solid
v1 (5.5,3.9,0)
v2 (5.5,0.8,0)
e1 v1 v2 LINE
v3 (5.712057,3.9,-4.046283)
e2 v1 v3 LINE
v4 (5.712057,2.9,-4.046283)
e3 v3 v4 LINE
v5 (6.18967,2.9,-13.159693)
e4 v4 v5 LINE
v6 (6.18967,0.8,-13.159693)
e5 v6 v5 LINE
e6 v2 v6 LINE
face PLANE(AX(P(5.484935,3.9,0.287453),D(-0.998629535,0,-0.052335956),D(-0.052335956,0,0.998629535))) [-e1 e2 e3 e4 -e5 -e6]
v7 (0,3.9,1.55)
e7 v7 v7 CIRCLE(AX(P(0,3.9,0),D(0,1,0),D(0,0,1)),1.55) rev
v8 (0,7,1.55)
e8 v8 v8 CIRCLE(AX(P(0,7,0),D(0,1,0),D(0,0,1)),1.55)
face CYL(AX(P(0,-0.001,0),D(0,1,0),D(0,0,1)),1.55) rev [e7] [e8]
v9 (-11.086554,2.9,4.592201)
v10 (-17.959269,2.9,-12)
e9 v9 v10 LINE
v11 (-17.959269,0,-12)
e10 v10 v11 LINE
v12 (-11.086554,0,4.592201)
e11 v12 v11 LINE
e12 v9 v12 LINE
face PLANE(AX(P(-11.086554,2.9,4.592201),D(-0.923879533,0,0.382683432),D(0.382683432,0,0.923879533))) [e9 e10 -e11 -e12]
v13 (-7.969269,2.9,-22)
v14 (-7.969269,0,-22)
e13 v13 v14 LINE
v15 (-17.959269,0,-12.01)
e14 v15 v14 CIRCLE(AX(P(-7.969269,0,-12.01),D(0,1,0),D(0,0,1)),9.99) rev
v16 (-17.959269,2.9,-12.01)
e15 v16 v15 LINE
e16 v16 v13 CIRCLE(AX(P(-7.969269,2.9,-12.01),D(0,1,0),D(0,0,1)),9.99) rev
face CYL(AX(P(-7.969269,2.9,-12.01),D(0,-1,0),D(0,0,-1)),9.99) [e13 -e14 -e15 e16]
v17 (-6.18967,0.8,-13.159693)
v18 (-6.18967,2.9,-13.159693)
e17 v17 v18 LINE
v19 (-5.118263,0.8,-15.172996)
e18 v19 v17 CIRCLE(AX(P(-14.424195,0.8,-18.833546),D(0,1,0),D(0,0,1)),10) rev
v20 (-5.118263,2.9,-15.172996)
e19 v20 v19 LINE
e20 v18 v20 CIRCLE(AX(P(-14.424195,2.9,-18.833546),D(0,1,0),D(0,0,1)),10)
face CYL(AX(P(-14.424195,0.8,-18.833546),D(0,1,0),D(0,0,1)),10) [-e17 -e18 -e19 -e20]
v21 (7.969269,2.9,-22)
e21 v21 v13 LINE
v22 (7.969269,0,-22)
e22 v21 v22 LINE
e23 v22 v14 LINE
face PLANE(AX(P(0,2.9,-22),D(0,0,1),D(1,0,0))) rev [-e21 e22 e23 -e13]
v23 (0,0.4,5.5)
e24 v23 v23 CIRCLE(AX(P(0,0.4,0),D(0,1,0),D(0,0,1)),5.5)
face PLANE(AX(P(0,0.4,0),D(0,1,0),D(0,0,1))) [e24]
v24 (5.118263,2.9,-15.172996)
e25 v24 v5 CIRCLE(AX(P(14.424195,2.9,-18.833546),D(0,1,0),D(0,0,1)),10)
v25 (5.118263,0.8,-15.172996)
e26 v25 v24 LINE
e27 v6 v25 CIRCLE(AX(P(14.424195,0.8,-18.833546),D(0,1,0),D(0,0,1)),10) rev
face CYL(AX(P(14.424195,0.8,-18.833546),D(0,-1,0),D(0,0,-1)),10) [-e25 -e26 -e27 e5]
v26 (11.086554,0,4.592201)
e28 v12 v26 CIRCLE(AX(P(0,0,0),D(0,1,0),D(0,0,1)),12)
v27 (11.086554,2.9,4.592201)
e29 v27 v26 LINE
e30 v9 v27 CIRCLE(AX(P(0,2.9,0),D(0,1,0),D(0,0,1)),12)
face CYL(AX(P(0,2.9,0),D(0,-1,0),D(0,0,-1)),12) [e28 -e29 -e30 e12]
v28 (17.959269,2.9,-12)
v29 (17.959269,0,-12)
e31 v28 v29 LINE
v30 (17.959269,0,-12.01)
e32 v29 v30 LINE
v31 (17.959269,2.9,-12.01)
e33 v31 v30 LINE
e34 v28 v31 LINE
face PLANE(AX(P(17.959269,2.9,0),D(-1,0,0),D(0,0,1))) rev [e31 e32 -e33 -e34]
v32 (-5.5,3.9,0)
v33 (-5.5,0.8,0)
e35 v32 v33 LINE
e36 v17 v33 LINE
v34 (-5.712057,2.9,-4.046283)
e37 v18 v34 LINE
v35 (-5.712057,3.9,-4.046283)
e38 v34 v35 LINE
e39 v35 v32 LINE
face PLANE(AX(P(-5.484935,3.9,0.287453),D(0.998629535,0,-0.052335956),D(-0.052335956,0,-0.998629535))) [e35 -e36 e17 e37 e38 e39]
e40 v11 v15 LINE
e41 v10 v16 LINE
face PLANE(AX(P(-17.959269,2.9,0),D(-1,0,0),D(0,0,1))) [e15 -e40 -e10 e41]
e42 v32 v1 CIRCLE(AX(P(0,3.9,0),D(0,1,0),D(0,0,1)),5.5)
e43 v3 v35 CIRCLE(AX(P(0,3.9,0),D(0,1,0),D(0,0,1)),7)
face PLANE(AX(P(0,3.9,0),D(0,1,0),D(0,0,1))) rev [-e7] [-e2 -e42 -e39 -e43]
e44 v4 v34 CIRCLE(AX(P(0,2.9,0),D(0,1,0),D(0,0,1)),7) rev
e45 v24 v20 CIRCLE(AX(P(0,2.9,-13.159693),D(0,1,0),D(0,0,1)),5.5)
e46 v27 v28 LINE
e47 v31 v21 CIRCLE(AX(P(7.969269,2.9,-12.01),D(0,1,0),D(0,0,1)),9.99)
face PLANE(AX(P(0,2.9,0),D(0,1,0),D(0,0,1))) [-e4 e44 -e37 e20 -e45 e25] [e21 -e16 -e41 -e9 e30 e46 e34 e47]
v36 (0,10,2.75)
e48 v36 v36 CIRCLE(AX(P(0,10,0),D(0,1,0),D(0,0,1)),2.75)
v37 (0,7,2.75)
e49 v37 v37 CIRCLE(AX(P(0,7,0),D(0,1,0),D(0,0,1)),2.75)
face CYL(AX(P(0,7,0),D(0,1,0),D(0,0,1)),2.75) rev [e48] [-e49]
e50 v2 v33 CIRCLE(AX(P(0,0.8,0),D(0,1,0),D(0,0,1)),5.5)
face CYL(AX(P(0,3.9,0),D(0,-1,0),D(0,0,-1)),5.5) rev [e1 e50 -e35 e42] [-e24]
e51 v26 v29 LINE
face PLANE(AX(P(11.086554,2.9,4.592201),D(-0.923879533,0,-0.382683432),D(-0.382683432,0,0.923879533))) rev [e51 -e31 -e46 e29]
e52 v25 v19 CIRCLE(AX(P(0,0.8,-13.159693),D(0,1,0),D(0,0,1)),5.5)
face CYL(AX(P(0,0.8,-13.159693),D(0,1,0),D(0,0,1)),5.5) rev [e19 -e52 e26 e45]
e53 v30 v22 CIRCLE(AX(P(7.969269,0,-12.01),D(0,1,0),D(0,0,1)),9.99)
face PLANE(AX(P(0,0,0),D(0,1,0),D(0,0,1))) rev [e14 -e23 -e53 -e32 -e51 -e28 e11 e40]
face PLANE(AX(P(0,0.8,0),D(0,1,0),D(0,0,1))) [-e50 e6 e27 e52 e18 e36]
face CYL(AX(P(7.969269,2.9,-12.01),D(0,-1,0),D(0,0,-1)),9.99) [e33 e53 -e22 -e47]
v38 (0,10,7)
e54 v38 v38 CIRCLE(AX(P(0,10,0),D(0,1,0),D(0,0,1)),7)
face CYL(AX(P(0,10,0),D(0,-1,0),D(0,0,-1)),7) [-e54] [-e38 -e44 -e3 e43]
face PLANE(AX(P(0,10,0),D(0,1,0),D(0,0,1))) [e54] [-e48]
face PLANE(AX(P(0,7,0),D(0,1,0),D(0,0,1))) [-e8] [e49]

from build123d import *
from build123d.topology import SkipClean

# Parameters (mm, degrees)
SKETCH1_R           = 12
SKETCH1_R_2         = 7
SKETCH1_R_3         = 5.5
BOSS_EXTRUDE1_DEPTH = 2.9
SKETCH1_3_R         = 7
SKETCH1_3_R_2       = 5.5
BOSS_EXTRUDE2_DEPTH = 10
SKETCH2_R           = 5.5
CUT_EXTRUDE2_DEPTH  = 1
SKETCH3_R           = 5.5
CUT_EXTRUDE3_DEPTH  = 1
CUT_EXTRUDE4_START  = -2.5
SKETCH3_4_R         = 5.5
CUT_EXTRUDE4_DEPTH  = 2.5
CUT_EXTRUDE6_REACH  = 32.109
SKETCH5_R           = 1.55
CUT_EXTRUDE7_START  = -2.1
CUT_EXTRUDE7_DEPTH  = 2.1
SKETCH6_R           = 5.5
CUT_EXTRUDE8_DEPTH  = 2.1
FILLET1_R           = 10
SKETCH5_3_R         = 2.75
SKETCH5_3_R_2       = 1.55
CUT_EXTRUDE9_DEPTH  = 3


with BuildPart() as part:
    # Sketch1 → Boss-Extrude1 (new body)
    # profile 1 of 4: a face of its own
    with BuildSketch(Plane(origin=(0, 0, 0), x_dir=(1, 0, 0), z_dir=(0, 1, 0))):
        Circle(SKETCH1_R)
        Circle(SKETCH1_R_2, mode=Mode.SUBTRACT)
    # profile 2 of 4: a face of its own
    with BuildSketch(Plane(origin=(0, 0, 0), x_dir=(1, 0, 0), z_dir=(0, 1, 0))):
        with BuildLine():
            ThreePointArc((12, -2.94e-15), (11.769423369196444, -2.341083842286014), (11.086554407231223, -4.592201147108209))
            Line((11.086554407231223, -4.592201147108209), (17.959269151985882, 12))
            Line((17.959269151985882, 12), (17.959269151985882, 12.009999999999998))
            ThreePointArc((17.959269151985882, 12.009999999999998), (15.033265896039495, 19.07399674405361), (7.969269151985883, 21.999999999999996))
            Line((7.969269151985883, 21.999999999999996), (-7.969269151985883, 21.999999999999996))
            ThreePointArc((-7.969269151985883, 21.999999999999993), (-15.033265896039492, 19.07399674405361), (-17.959269151985882, 12.009999999999998))
            Line((-17.959269151985882, 12.009999999999998), (-17.959269151985882, 12))
            Line((-17.95926915198589, 12.000000000000014), (-11.086554257092926, -4.592201509574117))
            ThreePointArc((-11.08655425709292, -4.592201509574119), (-2.3410840346818973, 11.769423330926521), (12, 0))
        make_face()
    # profile 3 of 4: a face of its own
    with BuildSketch(Plane(origin=(0, 0, 0), x_dir=(1, 0, 0), z_dir=(0, 1, 0))):
        Circle(SKETCH1_R_2)
    # profile 4 of 4: a face of its own
    with BuildSketch(Plane(origin=(0, 0, 0), x_dir=(1, 0, 0), z_dir=(0, 1, 0))):
        Circle(SKETCH1_R_3)
    extrude(amount=BOSS_EXTRUDE1_DEPTH)

    # Sketch1<3> → Boss-Extrude2 (add)
    with BuildSketch(Plane(origin=(0, 0, 0), x_dir=(1, 0, 0), z_dir=(0, 1, 0))):
        with Locations(Location((0, 0, 0), (0, 0, 270))):
            Circle(SKETCH1_3_R)
        Circle(SKETCH1_3_R_2)
    extrude(amount=BOSS_EXTRUDE2_DEPTH)

    # Sketch2 → Cut-Extrude2 (cut)
    with SkipClean():  # the faces are left unmerged after this step: merging them gives an invalid solid
        with BuildSketch(Plane(origin=(0, 2.9, 0), x_dir=(1, 0, 0), z_dir=(0, 1, 0))):
            with BuildLine():
                ThreePointArc((-5.500000000000162, 4.330127018921988), (-1.9852e-13, 7), (5.499999999999917, 4.330127018922298))
                Line((5.5, 4.330127018922322), (5.5, 11.712224753227023))
                Line((5.5, 11.712224753227023), (-5.5, 11.712224753227023))
                Line((-5.5, 11.712224753227023), (-5.5, 4.330127018921939))
            make_face()
            with Locations(Location((0, 0, 0), (0, 0, 270))):
                Circle(SKETCH2_R)
        extrude(amount=CUT_EXTRUDE2_DEPTH, mode=Mode.SUBTRACT)

    # Sketch3 → Cut-Extrude3 (cut)
    with BuildSketch(Plane(origin=(0, 2.9, 0), x_dir=(1, 0, 0), z_dir=(0, 1, 0))):
        Circle(SKETCH3_R)
        with BuildLine():
            ThreePointArc((-5.5, 3.12e-15), (1.56e-15, 5.5), (5.5, 0))
            Line((5.5, 0), (6.1896702982743115, 13.159693230837554))
            Line((6.1896702982743115, 13.159693230837554), (-6.189670298274319, 13.159693230837554))
            Line((-6.1896702982743195, 13.159693230837554), (-5.5, 0))
        make_face()
    extrude(amount=CUT_EXTRUDE3_DEPTH, mode=Mode.SUBTRACT)

    # Sketch3<4> → Cut-Extrude4 (cut)
    with SkipClean():  # the faces are left unmerged after this step: merging them gives an invalid solid
        with BuildSketch(Plane(origin=(0, 2.9, 0), x_dir=(1, 0, 0), z_dir=(0, 1, 0)).offset(CUT_EXTRUDE4_START)):
            with Locations(Location((0, 0, 0), (0, 0, 180))):
                Circle(SKETCH3_4_R)
        extrude(amount=CUT_EXTRUDE4_DEPTH, mode=Mode.SUBTRACT)

    # Sketch5 → Cut-Extrude6 (cut, up to next)
    with BuildSketch(Plane(origin=(0, 10, 0), x_dir=(1, 0, 0), z_dir=(0, 1, 0)), mode=Mode.PRIVATE) as cut_extrude6_sk1:
        with Locations(Location((0, 0, 0), (0, 0, 270))):
            Circle(SKETCH5_R)
    cut_extrude6_tool1 = extrude(cut_extrude6_sk1.sketch, amount=-CUT_EXTRUDE6_REACH, mode=Mode.PRIVATE) & part.part
    add(cut_extrude6_tool1.solids().sort_by_distance((0, 10, 0))[0], mode=Mode.SUBTRACT)

    # Sketch3<5> → Cut-Extrude7 (cut)
    with BuildSketch(Plane(origin=(0, 2.9, 0), x_dir=(1, 0, 0), z_dir=(0, 1, 0)).offset(CUT_EXTRUDE7_START)):
        with BuildLine():
            ThreePointArc((-5.5, 3.12e-15), (1.56e-15, 5.5), (5.5, 0))
            Line((5.5, 0), (6.1896702982743115, 13.159693230837554))
            Line((6.1896702982743115, 13.159693230837554), (-6.189670298274319, 13.159693230837554))
            Line((-6.1896702982743195, 13.159693230837554), (-5.5, 0))
        make_face()
    extrude(amount=CUT_EXTRUDE7_DEPTH, mode=Mode.SUBTRACT)

    # Sketch6 → Cut-Extrude8 (cut)
    with BuildSketch(Plane(origin=(0, 2.9, 0), x_dir=(1, 0, 0), z_dir=(0, 1, 0))):
        with Locations((-4.34e-15, 13.159693230837554)):
            Circle(SKETCH6_R)
    extrude(amount=-CUT_EXTRUDE8_DEPTH, mode=Mode.SUBTRACT)

    # Fillet1
    # the kernel refuses this fillet: 10 mm, written as the material it takes off along each edge
    with BuildSketch(Plane(origin=(5.499999999999996, 8.022933245127838, -13.159693230837554), x_dir=(1, 0, 0), z_dir=(0, -1, 0))) as fillet1_piece_1:
        with BuildLine():
            CenterArc((8.924194649844473, -5.6738530738289406), FILLET1_R, 145.43190419239474, 13.095569895078825)
            ThreePointArc((-0.3817373823132515, -2.01330270361672), (-0.09627700574515341, -1.0245866490255686), (0, 0))
            Line((0, 0), (0.6896702982743177, 0))
        make_face()
    extrude(amount=7.222933245127838, mode=Mode.SUBTRACT)
    with BuildSketch(Plane(origin=(-5.500000000000004, 0.7999999999999998, -13.159693230837554), x_dir=(0.18628848164101172, 0, -0.9824950898645174), z_dir=(0, 1, 0))) as fillet1_piece_2:
        with BuildLine():
            CenterArc((3.9120581144612516, 9.824950898645172), FILLET1_R, 246.168167148658, 13.095569895078825)
            Line((-0.12847763269842533, 0.6775976816799091), (0, 0))
            ThreePointArc((0, 0), (1.0245866490255648, 0.09627700574515353), (2.0491732980511315, -1e-17))
        make_face()
    extrude(amount=7.222933245127831, mode=Mode.SUBTRACT)

    # Sketch5<3> → Cut-Extrude9 (cut)
    with BuildSketch(Plane(origin=(0, 10, 0), x_dir=(1, 0, 0), z_dir=(0, 1, 0))):
        with Locations(Location((0, 0, 0), (0, 0, 270))):
            Circle(SKETCH5_3_R)
        with Locations(Location((0, 0, 0), (0, 0, 270))):
            Circle(SKETCH5_3_R_2, mode=Mode.SUBTRACT)
    extrude(amount=-CUT_EXTRUDE9_DEPTH, mode=Mode.SUBTRACT)


solid = part.part
